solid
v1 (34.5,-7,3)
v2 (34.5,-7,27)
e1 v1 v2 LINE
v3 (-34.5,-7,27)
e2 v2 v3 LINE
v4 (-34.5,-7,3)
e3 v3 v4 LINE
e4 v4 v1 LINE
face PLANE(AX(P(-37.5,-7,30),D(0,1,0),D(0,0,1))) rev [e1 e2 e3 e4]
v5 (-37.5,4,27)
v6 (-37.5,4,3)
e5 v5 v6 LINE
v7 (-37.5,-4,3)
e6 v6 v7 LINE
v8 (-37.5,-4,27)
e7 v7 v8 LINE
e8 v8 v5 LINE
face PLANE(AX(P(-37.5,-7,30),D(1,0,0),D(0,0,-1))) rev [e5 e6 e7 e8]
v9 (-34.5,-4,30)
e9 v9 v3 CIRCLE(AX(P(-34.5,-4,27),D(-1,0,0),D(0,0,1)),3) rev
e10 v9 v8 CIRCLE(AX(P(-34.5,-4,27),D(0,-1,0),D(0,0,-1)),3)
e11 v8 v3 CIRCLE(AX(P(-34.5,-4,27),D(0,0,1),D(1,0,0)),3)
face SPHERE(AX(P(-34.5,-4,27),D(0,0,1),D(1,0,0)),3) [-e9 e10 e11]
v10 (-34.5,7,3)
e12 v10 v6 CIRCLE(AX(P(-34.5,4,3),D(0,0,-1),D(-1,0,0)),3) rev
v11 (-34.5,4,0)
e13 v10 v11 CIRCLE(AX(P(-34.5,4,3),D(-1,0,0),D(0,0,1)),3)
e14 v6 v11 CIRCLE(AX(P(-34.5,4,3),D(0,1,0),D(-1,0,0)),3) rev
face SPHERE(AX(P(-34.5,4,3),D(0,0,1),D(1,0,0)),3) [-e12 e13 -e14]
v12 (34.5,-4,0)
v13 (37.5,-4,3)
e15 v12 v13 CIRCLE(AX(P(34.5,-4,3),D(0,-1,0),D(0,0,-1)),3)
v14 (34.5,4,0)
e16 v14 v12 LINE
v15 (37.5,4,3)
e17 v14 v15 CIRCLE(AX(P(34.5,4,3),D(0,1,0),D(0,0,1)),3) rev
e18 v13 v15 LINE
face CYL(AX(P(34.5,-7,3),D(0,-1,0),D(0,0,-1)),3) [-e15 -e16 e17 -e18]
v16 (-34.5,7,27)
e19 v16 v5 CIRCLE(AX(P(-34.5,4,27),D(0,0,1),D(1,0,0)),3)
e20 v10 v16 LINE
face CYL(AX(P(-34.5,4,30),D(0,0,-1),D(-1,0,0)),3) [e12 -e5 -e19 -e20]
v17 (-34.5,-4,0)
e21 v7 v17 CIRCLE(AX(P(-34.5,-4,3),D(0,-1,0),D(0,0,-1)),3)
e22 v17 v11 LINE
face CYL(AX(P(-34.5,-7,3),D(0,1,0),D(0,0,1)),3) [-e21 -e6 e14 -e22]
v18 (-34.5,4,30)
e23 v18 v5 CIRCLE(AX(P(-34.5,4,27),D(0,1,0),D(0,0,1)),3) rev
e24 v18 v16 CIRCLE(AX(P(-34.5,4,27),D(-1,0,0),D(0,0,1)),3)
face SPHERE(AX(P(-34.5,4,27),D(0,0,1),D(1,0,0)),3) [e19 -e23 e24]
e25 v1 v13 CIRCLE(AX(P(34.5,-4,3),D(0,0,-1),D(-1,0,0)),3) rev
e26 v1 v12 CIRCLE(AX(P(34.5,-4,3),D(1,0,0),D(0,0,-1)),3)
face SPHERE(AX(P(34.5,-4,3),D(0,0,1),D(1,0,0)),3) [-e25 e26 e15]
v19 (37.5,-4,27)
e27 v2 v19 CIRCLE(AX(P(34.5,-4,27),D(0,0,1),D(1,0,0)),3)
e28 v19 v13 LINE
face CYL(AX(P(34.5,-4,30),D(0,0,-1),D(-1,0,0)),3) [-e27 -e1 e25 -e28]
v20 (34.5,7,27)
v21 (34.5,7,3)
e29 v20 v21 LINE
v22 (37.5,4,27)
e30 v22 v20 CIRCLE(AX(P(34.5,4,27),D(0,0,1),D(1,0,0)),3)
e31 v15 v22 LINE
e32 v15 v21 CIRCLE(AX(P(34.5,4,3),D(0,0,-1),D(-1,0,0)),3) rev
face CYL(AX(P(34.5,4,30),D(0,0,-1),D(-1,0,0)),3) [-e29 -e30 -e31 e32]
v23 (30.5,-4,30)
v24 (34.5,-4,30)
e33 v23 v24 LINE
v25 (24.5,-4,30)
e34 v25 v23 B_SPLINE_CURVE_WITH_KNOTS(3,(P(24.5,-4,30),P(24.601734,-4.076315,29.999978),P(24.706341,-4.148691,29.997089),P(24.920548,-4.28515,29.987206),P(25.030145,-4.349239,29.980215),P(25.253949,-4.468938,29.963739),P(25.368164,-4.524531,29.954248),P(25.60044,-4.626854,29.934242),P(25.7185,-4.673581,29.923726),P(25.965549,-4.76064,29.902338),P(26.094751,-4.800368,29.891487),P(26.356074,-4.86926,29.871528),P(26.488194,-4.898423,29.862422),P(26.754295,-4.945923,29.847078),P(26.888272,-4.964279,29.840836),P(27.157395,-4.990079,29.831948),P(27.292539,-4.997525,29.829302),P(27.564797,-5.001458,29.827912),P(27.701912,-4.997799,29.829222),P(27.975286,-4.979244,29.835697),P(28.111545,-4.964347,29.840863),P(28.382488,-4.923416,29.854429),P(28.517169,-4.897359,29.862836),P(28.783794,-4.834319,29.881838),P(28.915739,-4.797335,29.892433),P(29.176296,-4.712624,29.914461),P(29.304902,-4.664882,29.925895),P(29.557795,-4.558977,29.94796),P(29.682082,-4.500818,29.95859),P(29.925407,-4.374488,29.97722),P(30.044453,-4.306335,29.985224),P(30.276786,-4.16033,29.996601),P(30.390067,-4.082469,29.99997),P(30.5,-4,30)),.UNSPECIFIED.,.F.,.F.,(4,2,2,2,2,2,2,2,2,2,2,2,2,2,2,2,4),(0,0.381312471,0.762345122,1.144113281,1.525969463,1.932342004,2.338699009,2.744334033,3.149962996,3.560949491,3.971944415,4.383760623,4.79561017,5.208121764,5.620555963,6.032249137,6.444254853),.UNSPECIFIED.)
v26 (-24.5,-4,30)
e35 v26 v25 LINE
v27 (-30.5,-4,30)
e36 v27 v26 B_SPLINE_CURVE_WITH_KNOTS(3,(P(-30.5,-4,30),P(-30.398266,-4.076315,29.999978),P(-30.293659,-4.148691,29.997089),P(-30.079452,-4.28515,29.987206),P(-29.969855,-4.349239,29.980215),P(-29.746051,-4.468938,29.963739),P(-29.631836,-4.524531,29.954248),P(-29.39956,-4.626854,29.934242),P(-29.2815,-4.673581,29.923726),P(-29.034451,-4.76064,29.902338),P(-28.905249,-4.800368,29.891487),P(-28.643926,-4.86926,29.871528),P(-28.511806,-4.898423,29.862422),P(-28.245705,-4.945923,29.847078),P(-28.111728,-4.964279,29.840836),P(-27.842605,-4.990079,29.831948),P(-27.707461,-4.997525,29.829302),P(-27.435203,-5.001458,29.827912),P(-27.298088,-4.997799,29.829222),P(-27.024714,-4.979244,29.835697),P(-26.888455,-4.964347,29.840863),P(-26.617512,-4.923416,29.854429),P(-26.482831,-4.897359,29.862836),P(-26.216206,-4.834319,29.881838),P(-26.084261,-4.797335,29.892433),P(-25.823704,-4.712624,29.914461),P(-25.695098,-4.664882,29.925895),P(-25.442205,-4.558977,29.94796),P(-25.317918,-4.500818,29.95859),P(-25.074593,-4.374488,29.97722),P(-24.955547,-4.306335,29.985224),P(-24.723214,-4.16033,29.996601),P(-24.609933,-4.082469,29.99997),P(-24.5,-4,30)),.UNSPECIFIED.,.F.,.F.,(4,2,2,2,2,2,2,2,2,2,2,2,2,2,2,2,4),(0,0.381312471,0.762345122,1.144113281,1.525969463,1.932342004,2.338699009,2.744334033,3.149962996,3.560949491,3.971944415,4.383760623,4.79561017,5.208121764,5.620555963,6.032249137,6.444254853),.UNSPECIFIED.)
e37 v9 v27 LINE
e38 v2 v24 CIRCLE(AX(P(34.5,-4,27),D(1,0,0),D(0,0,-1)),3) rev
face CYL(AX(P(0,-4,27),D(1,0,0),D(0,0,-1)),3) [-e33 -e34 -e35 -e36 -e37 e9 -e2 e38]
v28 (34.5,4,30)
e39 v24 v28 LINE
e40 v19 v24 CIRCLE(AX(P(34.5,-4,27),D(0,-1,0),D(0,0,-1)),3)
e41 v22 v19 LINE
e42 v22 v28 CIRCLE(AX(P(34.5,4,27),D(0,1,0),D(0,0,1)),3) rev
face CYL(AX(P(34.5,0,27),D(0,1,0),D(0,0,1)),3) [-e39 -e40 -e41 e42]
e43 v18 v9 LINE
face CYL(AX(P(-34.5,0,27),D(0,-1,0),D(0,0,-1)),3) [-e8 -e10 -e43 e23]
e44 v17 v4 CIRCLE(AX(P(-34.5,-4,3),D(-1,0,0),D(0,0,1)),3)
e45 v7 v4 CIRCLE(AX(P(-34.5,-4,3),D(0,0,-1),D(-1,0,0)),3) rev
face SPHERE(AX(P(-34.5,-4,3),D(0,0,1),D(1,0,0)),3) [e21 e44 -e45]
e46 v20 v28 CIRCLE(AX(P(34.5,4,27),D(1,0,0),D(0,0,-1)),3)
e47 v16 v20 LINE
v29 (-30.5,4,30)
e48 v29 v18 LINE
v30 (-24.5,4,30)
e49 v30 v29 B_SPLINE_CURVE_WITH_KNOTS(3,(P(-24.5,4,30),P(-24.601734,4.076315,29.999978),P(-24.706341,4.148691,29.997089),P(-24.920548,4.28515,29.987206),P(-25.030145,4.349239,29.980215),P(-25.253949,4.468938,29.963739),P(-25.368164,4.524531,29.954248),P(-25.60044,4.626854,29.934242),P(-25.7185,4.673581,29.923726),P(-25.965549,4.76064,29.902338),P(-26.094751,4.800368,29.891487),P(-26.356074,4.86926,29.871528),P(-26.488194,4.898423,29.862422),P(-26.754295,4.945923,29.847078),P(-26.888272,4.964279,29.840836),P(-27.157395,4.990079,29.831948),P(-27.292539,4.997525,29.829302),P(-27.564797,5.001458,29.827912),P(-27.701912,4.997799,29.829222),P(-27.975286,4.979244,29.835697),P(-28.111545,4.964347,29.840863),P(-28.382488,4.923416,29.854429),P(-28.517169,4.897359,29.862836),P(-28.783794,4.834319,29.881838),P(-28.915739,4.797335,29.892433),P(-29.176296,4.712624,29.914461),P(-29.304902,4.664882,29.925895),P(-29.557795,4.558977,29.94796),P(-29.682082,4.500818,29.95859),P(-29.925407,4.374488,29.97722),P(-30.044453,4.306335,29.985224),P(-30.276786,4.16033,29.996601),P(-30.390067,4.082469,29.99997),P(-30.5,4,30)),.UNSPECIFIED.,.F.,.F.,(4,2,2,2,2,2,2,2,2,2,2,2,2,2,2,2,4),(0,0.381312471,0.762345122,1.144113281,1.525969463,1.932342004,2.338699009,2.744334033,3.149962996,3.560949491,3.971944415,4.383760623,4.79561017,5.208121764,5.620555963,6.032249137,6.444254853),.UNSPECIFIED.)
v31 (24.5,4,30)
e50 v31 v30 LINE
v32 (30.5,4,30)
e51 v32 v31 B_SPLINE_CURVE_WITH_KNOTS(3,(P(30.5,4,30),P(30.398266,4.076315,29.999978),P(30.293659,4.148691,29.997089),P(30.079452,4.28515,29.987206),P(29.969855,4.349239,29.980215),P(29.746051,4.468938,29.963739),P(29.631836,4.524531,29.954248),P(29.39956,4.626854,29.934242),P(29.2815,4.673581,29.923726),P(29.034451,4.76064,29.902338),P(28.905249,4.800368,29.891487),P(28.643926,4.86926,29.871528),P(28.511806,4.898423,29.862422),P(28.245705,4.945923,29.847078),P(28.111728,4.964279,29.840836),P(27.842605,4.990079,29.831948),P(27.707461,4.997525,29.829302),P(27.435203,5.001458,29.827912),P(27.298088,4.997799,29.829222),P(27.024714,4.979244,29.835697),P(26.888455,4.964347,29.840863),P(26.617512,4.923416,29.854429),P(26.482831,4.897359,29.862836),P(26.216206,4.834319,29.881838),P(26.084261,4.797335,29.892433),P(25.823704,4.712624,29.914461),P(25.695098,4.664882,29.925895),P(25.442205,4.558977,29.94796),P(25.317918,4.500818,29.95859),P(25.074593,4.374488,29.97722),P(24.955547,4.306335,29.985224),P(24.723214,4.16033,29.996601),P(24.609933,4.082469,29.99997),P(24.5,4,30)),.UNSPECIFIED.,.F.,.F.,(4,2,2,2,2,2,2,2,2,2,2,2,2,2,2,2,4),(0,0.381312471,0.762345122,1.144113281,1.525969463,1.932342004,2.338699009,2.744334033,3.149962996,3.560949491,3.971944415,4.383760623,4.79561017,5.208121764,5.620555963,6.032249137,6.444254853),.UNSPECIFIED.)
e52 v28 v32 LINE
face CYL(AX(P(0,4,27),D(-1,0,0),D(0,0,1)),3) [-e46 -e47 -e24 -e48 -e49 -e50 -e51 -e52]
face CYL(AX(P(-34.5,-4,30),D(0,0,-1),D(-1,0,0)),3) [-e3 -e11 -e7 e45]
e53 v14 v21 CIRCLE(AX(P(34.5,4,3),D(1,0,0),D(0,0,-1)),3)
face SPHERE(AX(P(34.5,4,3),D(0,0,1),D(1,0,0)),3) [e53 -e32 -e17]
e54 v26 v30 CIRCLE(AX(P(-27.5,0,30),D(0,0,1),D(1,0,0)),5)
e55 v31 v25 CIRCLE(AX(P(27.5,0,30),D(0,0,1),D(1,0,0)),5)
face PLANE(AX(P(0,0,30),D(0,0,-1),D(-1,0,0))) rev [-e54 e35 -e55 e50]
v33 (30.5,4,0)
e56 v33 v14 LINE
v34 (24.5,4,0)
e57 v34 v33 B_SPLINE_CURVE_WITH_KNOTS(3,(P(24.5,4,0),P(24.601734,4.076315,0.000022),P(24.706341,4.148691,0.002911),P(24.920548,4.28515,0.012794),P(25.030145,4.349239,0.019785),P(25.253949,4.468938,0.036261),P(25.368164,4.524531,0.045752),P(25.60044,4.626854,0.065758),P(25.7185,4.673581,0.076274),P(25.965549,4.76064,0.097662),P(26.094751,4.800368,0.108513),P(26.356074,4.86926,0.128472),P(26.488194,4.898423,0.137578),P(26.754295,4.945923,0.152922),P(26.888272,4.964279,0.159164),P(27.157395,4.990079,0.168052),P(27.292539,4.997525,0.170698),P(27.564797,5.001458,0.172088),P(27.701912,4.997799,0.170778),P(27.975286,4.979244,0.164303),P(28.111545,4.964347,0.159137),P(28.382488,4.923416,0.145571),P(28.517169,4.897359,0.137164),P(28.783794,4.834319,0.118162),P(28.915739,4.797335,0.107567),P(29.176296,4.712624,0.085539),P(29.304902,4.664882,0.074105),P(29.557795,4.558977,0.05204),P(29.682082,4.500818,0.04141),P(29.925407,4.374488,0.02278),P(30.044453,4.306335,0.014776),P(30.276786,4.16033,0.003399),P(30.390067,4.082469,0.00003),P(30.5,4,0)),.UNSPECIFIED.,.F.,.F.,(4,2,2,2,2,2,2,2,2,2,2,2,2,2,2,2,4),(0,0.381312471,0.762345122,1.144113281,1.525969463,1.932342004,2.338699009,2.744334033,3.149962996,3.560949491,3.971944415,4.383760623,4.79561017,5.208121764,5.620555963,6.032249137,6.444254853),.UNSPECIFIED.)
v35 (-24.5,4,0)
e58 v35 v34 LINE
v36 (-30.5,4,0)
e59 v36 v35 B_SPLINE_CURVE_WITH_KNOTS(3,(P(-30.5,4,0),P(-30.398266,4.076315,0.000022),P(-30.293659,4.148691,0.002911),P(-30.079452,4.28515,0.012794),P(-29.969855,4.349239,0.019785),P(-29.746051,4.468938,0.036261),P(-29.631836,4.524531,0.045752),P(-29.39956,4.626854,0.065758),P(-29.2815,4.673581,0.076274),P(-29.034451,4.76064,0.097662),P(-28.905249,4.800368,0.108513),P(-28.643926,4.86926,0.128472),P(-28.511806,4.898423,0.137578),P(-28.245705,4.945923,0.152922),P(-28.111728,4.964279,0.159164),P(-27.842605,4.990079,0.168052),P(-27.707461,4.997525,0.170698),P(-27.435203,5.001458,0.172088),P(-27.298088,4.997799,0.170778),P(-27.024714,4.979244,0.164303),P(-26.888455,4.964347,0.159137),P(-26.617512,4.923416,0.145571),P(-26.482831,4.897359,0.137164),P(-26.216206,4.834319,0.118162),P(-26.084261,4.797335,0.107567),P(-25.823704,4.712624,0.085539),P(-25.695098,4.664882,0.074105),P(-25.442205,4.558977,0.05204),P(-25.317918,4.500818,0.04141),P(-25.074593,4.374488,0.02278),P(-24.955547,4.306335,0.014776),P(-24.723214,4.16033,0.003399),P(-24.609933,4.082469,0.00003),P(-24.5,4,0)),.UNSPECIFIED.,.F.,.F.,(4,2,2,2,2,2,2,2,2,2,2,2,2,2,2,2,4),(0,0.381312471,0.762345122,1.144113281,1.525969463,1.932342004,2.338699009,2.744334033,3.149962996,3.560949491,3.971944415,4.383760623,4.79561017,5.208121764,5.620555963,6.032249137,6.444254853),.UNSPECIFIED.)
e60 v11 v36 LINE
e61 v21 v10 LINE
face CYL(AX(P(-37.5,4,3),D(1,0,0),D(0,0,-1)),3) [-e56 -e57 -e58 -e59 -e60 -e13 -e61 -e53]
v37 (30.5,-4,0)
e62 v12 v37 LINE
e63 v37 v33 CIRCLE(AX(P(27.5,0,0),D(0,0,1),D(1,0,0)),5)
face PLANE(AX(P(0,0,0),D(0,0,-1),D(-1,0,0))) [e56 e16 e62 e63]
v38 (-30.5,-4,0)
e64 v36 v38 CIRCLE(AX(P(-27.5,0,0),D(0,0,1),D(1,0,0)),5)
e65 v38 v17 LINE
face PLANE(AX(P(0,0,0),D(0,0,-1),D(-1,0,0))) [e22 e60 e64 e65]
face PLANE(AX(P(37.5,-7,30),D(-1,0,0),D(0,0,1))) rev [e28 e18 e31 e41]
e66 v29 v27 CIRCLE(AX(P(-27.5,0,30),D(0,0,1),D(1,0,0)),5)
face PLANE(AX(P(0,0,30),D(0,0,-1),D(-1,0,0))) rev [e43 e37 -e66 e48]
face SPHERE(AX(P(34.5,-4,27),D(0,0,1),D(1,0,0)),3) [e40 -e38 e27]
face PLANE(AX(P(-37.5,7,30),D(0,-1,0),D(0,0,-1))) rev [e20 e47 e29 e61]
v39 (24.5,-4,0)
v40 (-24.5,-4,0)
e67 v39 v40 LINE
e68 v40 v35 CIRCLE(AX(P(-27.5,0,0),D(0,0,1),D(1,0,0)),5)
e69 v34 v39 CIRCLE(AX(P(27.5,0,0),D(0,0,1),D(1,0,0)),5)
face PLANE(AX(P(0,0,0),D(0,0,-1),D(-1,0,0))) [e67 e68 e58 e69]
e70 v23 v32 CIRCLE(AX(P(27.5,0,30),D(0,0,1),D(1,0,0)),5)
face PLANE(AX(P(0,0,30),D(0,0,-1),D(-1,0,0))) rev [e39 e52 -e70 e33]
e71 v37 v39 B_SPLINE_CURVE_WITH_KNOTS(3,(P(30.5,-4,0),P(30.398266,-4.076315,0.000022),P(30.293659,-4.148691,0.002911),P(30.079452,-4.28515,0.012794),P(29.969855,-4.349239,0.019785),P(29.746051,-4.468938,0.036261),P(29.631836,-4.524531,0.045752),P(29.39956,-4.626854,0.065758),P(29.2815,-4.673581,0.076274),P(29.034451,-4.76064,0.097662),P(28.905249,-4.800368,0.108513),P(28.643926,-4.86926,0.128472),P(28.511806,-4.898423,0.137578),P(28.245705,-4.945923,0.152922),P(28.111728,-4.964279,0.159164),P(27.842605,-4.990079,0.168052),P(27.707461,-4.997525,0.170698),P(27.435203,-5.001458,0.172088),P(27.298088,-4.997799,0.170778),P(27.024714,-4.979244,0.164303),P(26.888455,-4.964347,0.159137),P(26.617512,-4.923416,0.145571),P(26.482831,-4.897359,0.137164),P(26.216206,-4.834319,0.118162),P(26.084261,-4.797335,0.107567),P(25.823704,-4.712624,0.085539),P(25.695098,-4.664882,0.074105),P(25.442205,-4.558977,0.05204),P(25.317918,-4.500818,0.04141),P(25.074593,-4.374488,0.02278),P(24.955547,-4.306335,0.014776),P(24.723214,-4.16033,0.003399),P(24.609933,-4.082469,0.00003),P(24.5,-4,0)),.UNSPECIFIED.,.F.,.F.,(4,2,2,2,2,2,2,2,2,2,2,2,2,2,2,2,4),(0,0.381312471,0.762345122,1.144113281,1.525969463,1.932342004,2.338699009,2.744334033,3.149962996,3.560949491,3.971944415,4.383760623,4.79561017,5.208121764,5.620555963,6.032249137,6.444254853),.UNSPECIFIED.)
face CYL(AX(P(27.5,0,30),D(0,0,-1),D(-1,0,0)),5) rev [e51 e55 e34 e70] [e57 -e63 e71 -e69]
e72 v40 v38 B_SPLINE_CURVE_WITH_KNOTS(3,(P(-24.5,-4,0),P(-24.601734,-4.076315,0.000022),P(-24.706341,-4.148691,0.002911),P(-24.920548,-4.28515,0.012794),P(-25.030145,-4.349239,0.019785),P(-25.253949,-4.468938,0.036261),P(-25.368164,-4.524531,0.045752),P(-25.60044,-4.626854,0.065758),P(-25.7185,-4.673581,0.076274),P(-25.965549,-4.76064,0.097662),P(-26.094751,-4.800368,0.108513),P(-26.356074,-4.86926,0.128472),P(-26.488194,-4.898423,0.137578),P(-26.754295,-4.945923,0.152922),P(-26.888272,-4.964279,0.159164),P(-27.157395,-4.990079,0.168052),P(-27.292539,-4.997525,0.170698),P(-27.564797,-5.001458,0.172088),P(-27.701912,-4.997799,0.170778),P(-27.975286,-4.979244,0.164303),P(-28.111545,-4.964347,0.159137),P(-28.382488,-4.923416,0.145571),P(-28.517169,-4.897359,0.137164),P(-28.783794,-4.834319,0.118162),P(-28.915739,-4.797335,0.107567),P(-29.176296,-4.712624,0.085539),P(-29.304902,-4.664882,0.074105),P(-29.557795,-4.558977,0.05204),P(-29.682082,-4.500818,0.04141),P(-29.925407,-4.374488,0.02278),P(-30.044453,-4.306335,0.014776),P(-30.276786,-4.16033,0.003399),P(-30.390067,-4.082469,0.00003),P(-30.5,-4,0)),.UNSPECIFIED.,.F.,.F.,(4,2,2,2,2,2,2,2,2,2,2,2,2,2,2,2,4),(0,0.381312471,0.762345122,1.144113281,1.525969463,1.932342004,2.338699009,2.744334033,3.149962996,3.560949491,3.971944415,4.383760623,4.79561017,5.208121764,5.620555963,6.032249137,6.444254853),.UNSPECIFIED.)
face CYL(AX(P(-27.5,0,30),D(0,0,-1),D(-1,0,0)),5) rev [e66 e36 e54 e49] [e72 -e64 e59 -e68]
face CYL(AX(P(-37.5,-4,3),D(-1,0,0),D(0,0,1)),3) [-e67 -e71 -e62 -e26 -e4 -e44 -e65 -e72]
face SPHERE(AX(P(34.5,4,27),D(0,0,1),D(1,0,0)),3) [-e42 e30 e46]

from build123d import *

# Parameters (mm, degrees)
SKETCH1_W           = 75
SKETCH1_H           = 14
SKETCH1_R           = 5
BOSS_EXTRUDE1_DEPTH = 30
FILLET1_R           = 3


with BuildPart() as part:
    # Sketch1 → Boss-Extrude1 (new body)
    with BuildSketch(Plane.XY):
        Rectangle(SKETCH1_W, SKETCH1_H)
        with Locations((27.5, 0)):
            Circle(SKETCH1_R, mode=Mode.SUBTRACT)
        with Locations((-27.5, 0)):
            Circle(SKETCH1_R, mode=Mode.SUBTRACT)
    extrude(amount=BOSS_EXTRUDE1_DEPTH)

    # Fillet1
    # the kernel refuses this fillet: 3 mm, written as the material it takes off along each edge
    with BuildSketch(Plane(origin=(-34.5, 4, 27), x_dir=(-1, 0, 0), z_dir=(0, 1, 0))) as fillet1_piece_1_section:
        Polygon((0, 0), (FILLET1_R, 0), (FILLET1_R, FILLET1_R), (0, FILLET1_R), align=None)
    fillet1_piece_1 = extrude(amount=FILLET1_R, mode=Mode.PRIVATE)
    fillet1_piece_1 = fillet1_piece_1 - Plane(origin=(-34.5, 4, 27), x_dir=(0.7071067811865475, 0, -0.7071067811865475), z_dir=(0, 1, 0)) * Sphere(FILLET1_R, mode=Mode.PRIVATE)
    add(fillet1_piece_1, mode=Mode.SUBTRACT)
    with BuildSketch(Plane(origin=(-34.5, -4, 27), x_dir=(-1, 0, 0), z_dir=(0, -1, 0))) as fillet1_piece_2_section:
        Polygon((0, 0), (FILLET1_R, 0), (FILLET1_R, -FILLET1_R), (0, -FILLET1_R), align=None)
    fillet1_piece_2 = extrude(amount=FILLET1_R, mode=Mode.PRIVATE)
    fillet1_piece_2 = fillet1_piece_2 - Plane(origin=(-34.5, -4, 27), x_dir=(0.7071067811865475, 0, -0.7071067811865475), z_dir=(0, -1, 0)) * Sphere(FILLET1_R, mode=Mode.PRIVATE)
    add(fillet1_piece_2, mode=Mode.SUBTRACT)
    with BuildSketch(Plane(origin=(34.5, -4, 27), x_dir=(1, 0, 0), z_dir=(0, -1, 0))) as fillet1_piece_3_section:
        Polygon((0, 0), (FILLET1_R, 0), (FILLET1_R, FILLET1_R), (0, FILLET1_R), align=None)
    fillet1_piece_3 = extrude(amount=FILLET1_R, mode=Mode.PRIVATE)
    fillet1_piece_3 = fillet1_piece_3 - Plane(origin=(34.5, -4, 27), x_dir=(-0.7071067811865475, 0, -0.7071067811865475), z_dir=(0, -1, 0)) * Sphere(FILLET1_R, mode=Mode.PRIVATE)
    add(fillet1_piece_3, mode=Mode.SUBTRACT)
    with BuildSketch(Plane(origin=(34.5, 4, 27), x_dir=(0, 1, 0), z_dir=(1, 0, 0))) as fillet1_piece_4_section:
        Polygon((0, 0), (FILLET1_R, 0), (FILLET1_R, FILLET1_R), (0, FILLET1_R), align=None)
    fillet1_piece_4 = extrude(amount=FILLET1_R, mode=Mode.PRIVATE)
    fillet1_piece_4 = fillet1_piece_4 - Plane(origin=(34.5, 4, 27), x_dir=(0, -0.7071067811865475, -0.7071067811865475), z_dir=(1, 0, 0)) * Sphere(FILLET1_R, mode=Mode.PRIVATE)
    add(fillet1_piece_4, mode=Mode.SUBTRACT)
    with BuildSketch(Plane(origin=(-34.5, -4, 3), x_dir=(-1, 0, 0), z_dir=(0, -1, 0))) as fillet1_piece_5_section:
        Polygon((0, 0), (FILLET1_R, 0), (FILLET1_R, FILLET1_R), (0, FILLET1_R), align=None)
    fillet1_piece_5 = extrude(amount=FILLET1_R, mode=Mode.PRIVATE)
    fillet1_piece_5 = fillet1_piece_5 - Plane(origin=(-34.5, -4, 3), x_dir=(0.7071067811865475, 0, 0.7071067811865475), z_dir=(0, -1, 0)) * Sphere(FILLET1_R, mode=Mode.PRIVATE)
    add(fillet1_piece_5, mode=Mode.SUBTRACT)
    with BuildSketch(Plane(origin=(34.5, -4, 3), x_dir=(1, 0, 0), z_dir=(0, -1, 0))) as fillet1_piece_6_section:
        Polygon((0, 0), (FILLET1_R, 0), (FILLET1_R, -FILLET1_R), (0, -FILLET1_R), align=None)
    fillet1_piece_6 = extrude(amount=FILLET1_R, mode=Mode.PRIVATE)
    fillet1_piece_6 = fillet1_piece_6 - Plane(origin=(34.5, -4, 3), x_dir=(-0.7071067811865475, 0, 0.7071067811865475), z_dir=(0, -1, 0)) * Sphere(FILLET1_R, mode=Mode.PRIVATE)
    add(fillet1_piece_6, mode=Mode.SUBTRACT)
    with BuildSketch(Plane(origin=(-34.5, 4, 3), x_dir=(-1, 0, 0), z_dir=(0, 1, 0))) as fillet1_piece_7_section:
        Polygon((0, 0), (FILLET1_R, 0), (FILLET1_R, -FILLET1_R), (0, -FILLET1_R), align=None)
    fillet1_piece_7 = extrude(amount=FILLET1_R, mode=Mode.PRIVATE)
    fillet1_piece_7 = fillet1_piece_7 - Plane(origin=(-34.5, 4, 3), x_dir=(0.7071067811865475, 0, 0.7071067811865475), z_dir=(0, 1, 0)) * Sphere(FILLET1_R, mode=Mode.PRIVATE)
    add(fillet1_piece_7, mode=Mode.SUBTRACT)
    with BuildSketch(Plane(origin=(34.5, 4, 3), x_dir=(0, 1, 0), z_dir=(1, 0, 0))) as fillet1_piece_8_section:
        Polygon((0, 0), (FILLET1_R, 0), (FILLET1_R, -FILLET1_R), (0, -FILLET1_R), align=None)
    fillet1_piece_8 = extrude(amount=FILLET1_R, mode=Mode.PRIVATE)
    fillet1_piece_8 = fillet1_piece_8 - Plane(origin=(34.5, 4, 3), x_dir=(0, -0.7071067811865475, 0.7071067811865475), z_dir=(1, 0, 0)) * Sphere(FILLET1_R, mode=Mode.PRIVATE)
    add(fillet1_piece_8, mode=Mode.SUBTRACT)
    with BuildSketch(Plane(origin=(-37.5, 4, 30), x_dir=(0, 0, -1), z_dir=(0, -1, 0)), Plane(origin=(37.5, -4, 30), x_dir=(0, 0, -1), z_dir=(0, 1, 0))) as fillet1_piece_9:
        with BuildLine():
            CenterArc((FILLET1_R, FILLET1_R), FILLET1_R, 180, 90)
            Line((0, FILLET1_R), (0, 0))
            Line((0, 0), (FILLET1_R, 0))
        make_face()
    extrude(amount=8, mode=Mode.SUBTRACT)
    with BuildSketch(Plane(origin=(-34.5, -7, 30), x_dir=(0, 0, -1), z_dir=(1, 0, 0)), Plane(origin=(34.5, 7, 30), x_dir=(0, 0, -1), z_dir=(-1, 0, 0))) as fillet1_piece_10:
        with BuildLine():
            CenterArc((FILLET1_R, FILLET1_R), FILLET1_R, 180, 90)
            Line((0, FILLET1_R), (0, 0))
            Line((0, 0), (FILLET1_R, 0))
        make_face()
    extrude(amount=69, mode=Mode.SUBTRACT)
    with BuildSketch(Plane(origin=(-34.5, -7, 0), x_dir=(0, 0, 1), z_dir=(1, 0, 0)), Plane(origin=(34.5, 7, 0), x_dir=(0, 0, 1), z_dir=(-1, 0, 0))) as fillet1_piece_11:
        with BuildLine():
            CenterArc((FILLET1_R, -FILLET1_R), FILLET1_R, 90, 90)
            Line((0, -FILLET1_R), (0, 0))
            Line((0, 0), (FILLET1_R, 0))
        make_face()
    extrude(amount=69, mode=Mode.SUBTRACT)
    with BuildSketch(Plane(origin=(-37.5, 4, 0), x_dir=(0, 0, 1), z_dir=(0, -1, 0)), Plane(origin=(37.5, -4, 0), x_dir=(0, 0, 1), z_dir=(0, 1, 0))) as fillet1_piece_12:
        with BuildLine():
            CenterArc((FILLET1_R, -FILLET1_R), FILLET1_R, 90, 90)
            Line((0, -FILLET1_R), (0, 0))
            Line((0, 0), (FILLET1_R, 0))
        make_face()
    extrude(amount=8, mode=Mode.SUBTRACT)
    with BuildSketch(Plane(origin=(37.5, -7, 3), x_dir=(-1, 0, 0), z_dir=(0, 0, 1)), Plane(origin=(-37.5, 7, 3), x_dir=(1, 0, 0), z_dir=(0, 0, 1)), Plane(origin=(37.5, 7, 3), x_dir=(0, -1, 0), z_dir=(0, 0, 1))) as fillet1_piece_13:
        with BuildLine():
            CenterArc((FILLET1_R, -FILLET1_R), FILLET1_R, 90, 90)
            Line((0, -FILLET1_R), (0, 0))
            Line((0, 0), (FILLET1_R, 0))
        make_face()
    extrude(amount=24, mode=Mode.SUBTRACT)
    with BuildSketch(Plane(origin=(-37.5, -7, 3), x_dir=(1, 0, 0), z_dir=(0, 0, 1))) as fillet1_piece_14:
        with BuildLine():
            CenterArc((FILLET1_R, FILLET1_R), FILLET1_R, 180, 90)
            Line((0, FILLET1_R), (0, 0))
            Line((0, 0), (FILLET1_R, 0))
        make_face()
    extrude(amount=24, mode=Mode.SUBTRACT)


solid = part.part
